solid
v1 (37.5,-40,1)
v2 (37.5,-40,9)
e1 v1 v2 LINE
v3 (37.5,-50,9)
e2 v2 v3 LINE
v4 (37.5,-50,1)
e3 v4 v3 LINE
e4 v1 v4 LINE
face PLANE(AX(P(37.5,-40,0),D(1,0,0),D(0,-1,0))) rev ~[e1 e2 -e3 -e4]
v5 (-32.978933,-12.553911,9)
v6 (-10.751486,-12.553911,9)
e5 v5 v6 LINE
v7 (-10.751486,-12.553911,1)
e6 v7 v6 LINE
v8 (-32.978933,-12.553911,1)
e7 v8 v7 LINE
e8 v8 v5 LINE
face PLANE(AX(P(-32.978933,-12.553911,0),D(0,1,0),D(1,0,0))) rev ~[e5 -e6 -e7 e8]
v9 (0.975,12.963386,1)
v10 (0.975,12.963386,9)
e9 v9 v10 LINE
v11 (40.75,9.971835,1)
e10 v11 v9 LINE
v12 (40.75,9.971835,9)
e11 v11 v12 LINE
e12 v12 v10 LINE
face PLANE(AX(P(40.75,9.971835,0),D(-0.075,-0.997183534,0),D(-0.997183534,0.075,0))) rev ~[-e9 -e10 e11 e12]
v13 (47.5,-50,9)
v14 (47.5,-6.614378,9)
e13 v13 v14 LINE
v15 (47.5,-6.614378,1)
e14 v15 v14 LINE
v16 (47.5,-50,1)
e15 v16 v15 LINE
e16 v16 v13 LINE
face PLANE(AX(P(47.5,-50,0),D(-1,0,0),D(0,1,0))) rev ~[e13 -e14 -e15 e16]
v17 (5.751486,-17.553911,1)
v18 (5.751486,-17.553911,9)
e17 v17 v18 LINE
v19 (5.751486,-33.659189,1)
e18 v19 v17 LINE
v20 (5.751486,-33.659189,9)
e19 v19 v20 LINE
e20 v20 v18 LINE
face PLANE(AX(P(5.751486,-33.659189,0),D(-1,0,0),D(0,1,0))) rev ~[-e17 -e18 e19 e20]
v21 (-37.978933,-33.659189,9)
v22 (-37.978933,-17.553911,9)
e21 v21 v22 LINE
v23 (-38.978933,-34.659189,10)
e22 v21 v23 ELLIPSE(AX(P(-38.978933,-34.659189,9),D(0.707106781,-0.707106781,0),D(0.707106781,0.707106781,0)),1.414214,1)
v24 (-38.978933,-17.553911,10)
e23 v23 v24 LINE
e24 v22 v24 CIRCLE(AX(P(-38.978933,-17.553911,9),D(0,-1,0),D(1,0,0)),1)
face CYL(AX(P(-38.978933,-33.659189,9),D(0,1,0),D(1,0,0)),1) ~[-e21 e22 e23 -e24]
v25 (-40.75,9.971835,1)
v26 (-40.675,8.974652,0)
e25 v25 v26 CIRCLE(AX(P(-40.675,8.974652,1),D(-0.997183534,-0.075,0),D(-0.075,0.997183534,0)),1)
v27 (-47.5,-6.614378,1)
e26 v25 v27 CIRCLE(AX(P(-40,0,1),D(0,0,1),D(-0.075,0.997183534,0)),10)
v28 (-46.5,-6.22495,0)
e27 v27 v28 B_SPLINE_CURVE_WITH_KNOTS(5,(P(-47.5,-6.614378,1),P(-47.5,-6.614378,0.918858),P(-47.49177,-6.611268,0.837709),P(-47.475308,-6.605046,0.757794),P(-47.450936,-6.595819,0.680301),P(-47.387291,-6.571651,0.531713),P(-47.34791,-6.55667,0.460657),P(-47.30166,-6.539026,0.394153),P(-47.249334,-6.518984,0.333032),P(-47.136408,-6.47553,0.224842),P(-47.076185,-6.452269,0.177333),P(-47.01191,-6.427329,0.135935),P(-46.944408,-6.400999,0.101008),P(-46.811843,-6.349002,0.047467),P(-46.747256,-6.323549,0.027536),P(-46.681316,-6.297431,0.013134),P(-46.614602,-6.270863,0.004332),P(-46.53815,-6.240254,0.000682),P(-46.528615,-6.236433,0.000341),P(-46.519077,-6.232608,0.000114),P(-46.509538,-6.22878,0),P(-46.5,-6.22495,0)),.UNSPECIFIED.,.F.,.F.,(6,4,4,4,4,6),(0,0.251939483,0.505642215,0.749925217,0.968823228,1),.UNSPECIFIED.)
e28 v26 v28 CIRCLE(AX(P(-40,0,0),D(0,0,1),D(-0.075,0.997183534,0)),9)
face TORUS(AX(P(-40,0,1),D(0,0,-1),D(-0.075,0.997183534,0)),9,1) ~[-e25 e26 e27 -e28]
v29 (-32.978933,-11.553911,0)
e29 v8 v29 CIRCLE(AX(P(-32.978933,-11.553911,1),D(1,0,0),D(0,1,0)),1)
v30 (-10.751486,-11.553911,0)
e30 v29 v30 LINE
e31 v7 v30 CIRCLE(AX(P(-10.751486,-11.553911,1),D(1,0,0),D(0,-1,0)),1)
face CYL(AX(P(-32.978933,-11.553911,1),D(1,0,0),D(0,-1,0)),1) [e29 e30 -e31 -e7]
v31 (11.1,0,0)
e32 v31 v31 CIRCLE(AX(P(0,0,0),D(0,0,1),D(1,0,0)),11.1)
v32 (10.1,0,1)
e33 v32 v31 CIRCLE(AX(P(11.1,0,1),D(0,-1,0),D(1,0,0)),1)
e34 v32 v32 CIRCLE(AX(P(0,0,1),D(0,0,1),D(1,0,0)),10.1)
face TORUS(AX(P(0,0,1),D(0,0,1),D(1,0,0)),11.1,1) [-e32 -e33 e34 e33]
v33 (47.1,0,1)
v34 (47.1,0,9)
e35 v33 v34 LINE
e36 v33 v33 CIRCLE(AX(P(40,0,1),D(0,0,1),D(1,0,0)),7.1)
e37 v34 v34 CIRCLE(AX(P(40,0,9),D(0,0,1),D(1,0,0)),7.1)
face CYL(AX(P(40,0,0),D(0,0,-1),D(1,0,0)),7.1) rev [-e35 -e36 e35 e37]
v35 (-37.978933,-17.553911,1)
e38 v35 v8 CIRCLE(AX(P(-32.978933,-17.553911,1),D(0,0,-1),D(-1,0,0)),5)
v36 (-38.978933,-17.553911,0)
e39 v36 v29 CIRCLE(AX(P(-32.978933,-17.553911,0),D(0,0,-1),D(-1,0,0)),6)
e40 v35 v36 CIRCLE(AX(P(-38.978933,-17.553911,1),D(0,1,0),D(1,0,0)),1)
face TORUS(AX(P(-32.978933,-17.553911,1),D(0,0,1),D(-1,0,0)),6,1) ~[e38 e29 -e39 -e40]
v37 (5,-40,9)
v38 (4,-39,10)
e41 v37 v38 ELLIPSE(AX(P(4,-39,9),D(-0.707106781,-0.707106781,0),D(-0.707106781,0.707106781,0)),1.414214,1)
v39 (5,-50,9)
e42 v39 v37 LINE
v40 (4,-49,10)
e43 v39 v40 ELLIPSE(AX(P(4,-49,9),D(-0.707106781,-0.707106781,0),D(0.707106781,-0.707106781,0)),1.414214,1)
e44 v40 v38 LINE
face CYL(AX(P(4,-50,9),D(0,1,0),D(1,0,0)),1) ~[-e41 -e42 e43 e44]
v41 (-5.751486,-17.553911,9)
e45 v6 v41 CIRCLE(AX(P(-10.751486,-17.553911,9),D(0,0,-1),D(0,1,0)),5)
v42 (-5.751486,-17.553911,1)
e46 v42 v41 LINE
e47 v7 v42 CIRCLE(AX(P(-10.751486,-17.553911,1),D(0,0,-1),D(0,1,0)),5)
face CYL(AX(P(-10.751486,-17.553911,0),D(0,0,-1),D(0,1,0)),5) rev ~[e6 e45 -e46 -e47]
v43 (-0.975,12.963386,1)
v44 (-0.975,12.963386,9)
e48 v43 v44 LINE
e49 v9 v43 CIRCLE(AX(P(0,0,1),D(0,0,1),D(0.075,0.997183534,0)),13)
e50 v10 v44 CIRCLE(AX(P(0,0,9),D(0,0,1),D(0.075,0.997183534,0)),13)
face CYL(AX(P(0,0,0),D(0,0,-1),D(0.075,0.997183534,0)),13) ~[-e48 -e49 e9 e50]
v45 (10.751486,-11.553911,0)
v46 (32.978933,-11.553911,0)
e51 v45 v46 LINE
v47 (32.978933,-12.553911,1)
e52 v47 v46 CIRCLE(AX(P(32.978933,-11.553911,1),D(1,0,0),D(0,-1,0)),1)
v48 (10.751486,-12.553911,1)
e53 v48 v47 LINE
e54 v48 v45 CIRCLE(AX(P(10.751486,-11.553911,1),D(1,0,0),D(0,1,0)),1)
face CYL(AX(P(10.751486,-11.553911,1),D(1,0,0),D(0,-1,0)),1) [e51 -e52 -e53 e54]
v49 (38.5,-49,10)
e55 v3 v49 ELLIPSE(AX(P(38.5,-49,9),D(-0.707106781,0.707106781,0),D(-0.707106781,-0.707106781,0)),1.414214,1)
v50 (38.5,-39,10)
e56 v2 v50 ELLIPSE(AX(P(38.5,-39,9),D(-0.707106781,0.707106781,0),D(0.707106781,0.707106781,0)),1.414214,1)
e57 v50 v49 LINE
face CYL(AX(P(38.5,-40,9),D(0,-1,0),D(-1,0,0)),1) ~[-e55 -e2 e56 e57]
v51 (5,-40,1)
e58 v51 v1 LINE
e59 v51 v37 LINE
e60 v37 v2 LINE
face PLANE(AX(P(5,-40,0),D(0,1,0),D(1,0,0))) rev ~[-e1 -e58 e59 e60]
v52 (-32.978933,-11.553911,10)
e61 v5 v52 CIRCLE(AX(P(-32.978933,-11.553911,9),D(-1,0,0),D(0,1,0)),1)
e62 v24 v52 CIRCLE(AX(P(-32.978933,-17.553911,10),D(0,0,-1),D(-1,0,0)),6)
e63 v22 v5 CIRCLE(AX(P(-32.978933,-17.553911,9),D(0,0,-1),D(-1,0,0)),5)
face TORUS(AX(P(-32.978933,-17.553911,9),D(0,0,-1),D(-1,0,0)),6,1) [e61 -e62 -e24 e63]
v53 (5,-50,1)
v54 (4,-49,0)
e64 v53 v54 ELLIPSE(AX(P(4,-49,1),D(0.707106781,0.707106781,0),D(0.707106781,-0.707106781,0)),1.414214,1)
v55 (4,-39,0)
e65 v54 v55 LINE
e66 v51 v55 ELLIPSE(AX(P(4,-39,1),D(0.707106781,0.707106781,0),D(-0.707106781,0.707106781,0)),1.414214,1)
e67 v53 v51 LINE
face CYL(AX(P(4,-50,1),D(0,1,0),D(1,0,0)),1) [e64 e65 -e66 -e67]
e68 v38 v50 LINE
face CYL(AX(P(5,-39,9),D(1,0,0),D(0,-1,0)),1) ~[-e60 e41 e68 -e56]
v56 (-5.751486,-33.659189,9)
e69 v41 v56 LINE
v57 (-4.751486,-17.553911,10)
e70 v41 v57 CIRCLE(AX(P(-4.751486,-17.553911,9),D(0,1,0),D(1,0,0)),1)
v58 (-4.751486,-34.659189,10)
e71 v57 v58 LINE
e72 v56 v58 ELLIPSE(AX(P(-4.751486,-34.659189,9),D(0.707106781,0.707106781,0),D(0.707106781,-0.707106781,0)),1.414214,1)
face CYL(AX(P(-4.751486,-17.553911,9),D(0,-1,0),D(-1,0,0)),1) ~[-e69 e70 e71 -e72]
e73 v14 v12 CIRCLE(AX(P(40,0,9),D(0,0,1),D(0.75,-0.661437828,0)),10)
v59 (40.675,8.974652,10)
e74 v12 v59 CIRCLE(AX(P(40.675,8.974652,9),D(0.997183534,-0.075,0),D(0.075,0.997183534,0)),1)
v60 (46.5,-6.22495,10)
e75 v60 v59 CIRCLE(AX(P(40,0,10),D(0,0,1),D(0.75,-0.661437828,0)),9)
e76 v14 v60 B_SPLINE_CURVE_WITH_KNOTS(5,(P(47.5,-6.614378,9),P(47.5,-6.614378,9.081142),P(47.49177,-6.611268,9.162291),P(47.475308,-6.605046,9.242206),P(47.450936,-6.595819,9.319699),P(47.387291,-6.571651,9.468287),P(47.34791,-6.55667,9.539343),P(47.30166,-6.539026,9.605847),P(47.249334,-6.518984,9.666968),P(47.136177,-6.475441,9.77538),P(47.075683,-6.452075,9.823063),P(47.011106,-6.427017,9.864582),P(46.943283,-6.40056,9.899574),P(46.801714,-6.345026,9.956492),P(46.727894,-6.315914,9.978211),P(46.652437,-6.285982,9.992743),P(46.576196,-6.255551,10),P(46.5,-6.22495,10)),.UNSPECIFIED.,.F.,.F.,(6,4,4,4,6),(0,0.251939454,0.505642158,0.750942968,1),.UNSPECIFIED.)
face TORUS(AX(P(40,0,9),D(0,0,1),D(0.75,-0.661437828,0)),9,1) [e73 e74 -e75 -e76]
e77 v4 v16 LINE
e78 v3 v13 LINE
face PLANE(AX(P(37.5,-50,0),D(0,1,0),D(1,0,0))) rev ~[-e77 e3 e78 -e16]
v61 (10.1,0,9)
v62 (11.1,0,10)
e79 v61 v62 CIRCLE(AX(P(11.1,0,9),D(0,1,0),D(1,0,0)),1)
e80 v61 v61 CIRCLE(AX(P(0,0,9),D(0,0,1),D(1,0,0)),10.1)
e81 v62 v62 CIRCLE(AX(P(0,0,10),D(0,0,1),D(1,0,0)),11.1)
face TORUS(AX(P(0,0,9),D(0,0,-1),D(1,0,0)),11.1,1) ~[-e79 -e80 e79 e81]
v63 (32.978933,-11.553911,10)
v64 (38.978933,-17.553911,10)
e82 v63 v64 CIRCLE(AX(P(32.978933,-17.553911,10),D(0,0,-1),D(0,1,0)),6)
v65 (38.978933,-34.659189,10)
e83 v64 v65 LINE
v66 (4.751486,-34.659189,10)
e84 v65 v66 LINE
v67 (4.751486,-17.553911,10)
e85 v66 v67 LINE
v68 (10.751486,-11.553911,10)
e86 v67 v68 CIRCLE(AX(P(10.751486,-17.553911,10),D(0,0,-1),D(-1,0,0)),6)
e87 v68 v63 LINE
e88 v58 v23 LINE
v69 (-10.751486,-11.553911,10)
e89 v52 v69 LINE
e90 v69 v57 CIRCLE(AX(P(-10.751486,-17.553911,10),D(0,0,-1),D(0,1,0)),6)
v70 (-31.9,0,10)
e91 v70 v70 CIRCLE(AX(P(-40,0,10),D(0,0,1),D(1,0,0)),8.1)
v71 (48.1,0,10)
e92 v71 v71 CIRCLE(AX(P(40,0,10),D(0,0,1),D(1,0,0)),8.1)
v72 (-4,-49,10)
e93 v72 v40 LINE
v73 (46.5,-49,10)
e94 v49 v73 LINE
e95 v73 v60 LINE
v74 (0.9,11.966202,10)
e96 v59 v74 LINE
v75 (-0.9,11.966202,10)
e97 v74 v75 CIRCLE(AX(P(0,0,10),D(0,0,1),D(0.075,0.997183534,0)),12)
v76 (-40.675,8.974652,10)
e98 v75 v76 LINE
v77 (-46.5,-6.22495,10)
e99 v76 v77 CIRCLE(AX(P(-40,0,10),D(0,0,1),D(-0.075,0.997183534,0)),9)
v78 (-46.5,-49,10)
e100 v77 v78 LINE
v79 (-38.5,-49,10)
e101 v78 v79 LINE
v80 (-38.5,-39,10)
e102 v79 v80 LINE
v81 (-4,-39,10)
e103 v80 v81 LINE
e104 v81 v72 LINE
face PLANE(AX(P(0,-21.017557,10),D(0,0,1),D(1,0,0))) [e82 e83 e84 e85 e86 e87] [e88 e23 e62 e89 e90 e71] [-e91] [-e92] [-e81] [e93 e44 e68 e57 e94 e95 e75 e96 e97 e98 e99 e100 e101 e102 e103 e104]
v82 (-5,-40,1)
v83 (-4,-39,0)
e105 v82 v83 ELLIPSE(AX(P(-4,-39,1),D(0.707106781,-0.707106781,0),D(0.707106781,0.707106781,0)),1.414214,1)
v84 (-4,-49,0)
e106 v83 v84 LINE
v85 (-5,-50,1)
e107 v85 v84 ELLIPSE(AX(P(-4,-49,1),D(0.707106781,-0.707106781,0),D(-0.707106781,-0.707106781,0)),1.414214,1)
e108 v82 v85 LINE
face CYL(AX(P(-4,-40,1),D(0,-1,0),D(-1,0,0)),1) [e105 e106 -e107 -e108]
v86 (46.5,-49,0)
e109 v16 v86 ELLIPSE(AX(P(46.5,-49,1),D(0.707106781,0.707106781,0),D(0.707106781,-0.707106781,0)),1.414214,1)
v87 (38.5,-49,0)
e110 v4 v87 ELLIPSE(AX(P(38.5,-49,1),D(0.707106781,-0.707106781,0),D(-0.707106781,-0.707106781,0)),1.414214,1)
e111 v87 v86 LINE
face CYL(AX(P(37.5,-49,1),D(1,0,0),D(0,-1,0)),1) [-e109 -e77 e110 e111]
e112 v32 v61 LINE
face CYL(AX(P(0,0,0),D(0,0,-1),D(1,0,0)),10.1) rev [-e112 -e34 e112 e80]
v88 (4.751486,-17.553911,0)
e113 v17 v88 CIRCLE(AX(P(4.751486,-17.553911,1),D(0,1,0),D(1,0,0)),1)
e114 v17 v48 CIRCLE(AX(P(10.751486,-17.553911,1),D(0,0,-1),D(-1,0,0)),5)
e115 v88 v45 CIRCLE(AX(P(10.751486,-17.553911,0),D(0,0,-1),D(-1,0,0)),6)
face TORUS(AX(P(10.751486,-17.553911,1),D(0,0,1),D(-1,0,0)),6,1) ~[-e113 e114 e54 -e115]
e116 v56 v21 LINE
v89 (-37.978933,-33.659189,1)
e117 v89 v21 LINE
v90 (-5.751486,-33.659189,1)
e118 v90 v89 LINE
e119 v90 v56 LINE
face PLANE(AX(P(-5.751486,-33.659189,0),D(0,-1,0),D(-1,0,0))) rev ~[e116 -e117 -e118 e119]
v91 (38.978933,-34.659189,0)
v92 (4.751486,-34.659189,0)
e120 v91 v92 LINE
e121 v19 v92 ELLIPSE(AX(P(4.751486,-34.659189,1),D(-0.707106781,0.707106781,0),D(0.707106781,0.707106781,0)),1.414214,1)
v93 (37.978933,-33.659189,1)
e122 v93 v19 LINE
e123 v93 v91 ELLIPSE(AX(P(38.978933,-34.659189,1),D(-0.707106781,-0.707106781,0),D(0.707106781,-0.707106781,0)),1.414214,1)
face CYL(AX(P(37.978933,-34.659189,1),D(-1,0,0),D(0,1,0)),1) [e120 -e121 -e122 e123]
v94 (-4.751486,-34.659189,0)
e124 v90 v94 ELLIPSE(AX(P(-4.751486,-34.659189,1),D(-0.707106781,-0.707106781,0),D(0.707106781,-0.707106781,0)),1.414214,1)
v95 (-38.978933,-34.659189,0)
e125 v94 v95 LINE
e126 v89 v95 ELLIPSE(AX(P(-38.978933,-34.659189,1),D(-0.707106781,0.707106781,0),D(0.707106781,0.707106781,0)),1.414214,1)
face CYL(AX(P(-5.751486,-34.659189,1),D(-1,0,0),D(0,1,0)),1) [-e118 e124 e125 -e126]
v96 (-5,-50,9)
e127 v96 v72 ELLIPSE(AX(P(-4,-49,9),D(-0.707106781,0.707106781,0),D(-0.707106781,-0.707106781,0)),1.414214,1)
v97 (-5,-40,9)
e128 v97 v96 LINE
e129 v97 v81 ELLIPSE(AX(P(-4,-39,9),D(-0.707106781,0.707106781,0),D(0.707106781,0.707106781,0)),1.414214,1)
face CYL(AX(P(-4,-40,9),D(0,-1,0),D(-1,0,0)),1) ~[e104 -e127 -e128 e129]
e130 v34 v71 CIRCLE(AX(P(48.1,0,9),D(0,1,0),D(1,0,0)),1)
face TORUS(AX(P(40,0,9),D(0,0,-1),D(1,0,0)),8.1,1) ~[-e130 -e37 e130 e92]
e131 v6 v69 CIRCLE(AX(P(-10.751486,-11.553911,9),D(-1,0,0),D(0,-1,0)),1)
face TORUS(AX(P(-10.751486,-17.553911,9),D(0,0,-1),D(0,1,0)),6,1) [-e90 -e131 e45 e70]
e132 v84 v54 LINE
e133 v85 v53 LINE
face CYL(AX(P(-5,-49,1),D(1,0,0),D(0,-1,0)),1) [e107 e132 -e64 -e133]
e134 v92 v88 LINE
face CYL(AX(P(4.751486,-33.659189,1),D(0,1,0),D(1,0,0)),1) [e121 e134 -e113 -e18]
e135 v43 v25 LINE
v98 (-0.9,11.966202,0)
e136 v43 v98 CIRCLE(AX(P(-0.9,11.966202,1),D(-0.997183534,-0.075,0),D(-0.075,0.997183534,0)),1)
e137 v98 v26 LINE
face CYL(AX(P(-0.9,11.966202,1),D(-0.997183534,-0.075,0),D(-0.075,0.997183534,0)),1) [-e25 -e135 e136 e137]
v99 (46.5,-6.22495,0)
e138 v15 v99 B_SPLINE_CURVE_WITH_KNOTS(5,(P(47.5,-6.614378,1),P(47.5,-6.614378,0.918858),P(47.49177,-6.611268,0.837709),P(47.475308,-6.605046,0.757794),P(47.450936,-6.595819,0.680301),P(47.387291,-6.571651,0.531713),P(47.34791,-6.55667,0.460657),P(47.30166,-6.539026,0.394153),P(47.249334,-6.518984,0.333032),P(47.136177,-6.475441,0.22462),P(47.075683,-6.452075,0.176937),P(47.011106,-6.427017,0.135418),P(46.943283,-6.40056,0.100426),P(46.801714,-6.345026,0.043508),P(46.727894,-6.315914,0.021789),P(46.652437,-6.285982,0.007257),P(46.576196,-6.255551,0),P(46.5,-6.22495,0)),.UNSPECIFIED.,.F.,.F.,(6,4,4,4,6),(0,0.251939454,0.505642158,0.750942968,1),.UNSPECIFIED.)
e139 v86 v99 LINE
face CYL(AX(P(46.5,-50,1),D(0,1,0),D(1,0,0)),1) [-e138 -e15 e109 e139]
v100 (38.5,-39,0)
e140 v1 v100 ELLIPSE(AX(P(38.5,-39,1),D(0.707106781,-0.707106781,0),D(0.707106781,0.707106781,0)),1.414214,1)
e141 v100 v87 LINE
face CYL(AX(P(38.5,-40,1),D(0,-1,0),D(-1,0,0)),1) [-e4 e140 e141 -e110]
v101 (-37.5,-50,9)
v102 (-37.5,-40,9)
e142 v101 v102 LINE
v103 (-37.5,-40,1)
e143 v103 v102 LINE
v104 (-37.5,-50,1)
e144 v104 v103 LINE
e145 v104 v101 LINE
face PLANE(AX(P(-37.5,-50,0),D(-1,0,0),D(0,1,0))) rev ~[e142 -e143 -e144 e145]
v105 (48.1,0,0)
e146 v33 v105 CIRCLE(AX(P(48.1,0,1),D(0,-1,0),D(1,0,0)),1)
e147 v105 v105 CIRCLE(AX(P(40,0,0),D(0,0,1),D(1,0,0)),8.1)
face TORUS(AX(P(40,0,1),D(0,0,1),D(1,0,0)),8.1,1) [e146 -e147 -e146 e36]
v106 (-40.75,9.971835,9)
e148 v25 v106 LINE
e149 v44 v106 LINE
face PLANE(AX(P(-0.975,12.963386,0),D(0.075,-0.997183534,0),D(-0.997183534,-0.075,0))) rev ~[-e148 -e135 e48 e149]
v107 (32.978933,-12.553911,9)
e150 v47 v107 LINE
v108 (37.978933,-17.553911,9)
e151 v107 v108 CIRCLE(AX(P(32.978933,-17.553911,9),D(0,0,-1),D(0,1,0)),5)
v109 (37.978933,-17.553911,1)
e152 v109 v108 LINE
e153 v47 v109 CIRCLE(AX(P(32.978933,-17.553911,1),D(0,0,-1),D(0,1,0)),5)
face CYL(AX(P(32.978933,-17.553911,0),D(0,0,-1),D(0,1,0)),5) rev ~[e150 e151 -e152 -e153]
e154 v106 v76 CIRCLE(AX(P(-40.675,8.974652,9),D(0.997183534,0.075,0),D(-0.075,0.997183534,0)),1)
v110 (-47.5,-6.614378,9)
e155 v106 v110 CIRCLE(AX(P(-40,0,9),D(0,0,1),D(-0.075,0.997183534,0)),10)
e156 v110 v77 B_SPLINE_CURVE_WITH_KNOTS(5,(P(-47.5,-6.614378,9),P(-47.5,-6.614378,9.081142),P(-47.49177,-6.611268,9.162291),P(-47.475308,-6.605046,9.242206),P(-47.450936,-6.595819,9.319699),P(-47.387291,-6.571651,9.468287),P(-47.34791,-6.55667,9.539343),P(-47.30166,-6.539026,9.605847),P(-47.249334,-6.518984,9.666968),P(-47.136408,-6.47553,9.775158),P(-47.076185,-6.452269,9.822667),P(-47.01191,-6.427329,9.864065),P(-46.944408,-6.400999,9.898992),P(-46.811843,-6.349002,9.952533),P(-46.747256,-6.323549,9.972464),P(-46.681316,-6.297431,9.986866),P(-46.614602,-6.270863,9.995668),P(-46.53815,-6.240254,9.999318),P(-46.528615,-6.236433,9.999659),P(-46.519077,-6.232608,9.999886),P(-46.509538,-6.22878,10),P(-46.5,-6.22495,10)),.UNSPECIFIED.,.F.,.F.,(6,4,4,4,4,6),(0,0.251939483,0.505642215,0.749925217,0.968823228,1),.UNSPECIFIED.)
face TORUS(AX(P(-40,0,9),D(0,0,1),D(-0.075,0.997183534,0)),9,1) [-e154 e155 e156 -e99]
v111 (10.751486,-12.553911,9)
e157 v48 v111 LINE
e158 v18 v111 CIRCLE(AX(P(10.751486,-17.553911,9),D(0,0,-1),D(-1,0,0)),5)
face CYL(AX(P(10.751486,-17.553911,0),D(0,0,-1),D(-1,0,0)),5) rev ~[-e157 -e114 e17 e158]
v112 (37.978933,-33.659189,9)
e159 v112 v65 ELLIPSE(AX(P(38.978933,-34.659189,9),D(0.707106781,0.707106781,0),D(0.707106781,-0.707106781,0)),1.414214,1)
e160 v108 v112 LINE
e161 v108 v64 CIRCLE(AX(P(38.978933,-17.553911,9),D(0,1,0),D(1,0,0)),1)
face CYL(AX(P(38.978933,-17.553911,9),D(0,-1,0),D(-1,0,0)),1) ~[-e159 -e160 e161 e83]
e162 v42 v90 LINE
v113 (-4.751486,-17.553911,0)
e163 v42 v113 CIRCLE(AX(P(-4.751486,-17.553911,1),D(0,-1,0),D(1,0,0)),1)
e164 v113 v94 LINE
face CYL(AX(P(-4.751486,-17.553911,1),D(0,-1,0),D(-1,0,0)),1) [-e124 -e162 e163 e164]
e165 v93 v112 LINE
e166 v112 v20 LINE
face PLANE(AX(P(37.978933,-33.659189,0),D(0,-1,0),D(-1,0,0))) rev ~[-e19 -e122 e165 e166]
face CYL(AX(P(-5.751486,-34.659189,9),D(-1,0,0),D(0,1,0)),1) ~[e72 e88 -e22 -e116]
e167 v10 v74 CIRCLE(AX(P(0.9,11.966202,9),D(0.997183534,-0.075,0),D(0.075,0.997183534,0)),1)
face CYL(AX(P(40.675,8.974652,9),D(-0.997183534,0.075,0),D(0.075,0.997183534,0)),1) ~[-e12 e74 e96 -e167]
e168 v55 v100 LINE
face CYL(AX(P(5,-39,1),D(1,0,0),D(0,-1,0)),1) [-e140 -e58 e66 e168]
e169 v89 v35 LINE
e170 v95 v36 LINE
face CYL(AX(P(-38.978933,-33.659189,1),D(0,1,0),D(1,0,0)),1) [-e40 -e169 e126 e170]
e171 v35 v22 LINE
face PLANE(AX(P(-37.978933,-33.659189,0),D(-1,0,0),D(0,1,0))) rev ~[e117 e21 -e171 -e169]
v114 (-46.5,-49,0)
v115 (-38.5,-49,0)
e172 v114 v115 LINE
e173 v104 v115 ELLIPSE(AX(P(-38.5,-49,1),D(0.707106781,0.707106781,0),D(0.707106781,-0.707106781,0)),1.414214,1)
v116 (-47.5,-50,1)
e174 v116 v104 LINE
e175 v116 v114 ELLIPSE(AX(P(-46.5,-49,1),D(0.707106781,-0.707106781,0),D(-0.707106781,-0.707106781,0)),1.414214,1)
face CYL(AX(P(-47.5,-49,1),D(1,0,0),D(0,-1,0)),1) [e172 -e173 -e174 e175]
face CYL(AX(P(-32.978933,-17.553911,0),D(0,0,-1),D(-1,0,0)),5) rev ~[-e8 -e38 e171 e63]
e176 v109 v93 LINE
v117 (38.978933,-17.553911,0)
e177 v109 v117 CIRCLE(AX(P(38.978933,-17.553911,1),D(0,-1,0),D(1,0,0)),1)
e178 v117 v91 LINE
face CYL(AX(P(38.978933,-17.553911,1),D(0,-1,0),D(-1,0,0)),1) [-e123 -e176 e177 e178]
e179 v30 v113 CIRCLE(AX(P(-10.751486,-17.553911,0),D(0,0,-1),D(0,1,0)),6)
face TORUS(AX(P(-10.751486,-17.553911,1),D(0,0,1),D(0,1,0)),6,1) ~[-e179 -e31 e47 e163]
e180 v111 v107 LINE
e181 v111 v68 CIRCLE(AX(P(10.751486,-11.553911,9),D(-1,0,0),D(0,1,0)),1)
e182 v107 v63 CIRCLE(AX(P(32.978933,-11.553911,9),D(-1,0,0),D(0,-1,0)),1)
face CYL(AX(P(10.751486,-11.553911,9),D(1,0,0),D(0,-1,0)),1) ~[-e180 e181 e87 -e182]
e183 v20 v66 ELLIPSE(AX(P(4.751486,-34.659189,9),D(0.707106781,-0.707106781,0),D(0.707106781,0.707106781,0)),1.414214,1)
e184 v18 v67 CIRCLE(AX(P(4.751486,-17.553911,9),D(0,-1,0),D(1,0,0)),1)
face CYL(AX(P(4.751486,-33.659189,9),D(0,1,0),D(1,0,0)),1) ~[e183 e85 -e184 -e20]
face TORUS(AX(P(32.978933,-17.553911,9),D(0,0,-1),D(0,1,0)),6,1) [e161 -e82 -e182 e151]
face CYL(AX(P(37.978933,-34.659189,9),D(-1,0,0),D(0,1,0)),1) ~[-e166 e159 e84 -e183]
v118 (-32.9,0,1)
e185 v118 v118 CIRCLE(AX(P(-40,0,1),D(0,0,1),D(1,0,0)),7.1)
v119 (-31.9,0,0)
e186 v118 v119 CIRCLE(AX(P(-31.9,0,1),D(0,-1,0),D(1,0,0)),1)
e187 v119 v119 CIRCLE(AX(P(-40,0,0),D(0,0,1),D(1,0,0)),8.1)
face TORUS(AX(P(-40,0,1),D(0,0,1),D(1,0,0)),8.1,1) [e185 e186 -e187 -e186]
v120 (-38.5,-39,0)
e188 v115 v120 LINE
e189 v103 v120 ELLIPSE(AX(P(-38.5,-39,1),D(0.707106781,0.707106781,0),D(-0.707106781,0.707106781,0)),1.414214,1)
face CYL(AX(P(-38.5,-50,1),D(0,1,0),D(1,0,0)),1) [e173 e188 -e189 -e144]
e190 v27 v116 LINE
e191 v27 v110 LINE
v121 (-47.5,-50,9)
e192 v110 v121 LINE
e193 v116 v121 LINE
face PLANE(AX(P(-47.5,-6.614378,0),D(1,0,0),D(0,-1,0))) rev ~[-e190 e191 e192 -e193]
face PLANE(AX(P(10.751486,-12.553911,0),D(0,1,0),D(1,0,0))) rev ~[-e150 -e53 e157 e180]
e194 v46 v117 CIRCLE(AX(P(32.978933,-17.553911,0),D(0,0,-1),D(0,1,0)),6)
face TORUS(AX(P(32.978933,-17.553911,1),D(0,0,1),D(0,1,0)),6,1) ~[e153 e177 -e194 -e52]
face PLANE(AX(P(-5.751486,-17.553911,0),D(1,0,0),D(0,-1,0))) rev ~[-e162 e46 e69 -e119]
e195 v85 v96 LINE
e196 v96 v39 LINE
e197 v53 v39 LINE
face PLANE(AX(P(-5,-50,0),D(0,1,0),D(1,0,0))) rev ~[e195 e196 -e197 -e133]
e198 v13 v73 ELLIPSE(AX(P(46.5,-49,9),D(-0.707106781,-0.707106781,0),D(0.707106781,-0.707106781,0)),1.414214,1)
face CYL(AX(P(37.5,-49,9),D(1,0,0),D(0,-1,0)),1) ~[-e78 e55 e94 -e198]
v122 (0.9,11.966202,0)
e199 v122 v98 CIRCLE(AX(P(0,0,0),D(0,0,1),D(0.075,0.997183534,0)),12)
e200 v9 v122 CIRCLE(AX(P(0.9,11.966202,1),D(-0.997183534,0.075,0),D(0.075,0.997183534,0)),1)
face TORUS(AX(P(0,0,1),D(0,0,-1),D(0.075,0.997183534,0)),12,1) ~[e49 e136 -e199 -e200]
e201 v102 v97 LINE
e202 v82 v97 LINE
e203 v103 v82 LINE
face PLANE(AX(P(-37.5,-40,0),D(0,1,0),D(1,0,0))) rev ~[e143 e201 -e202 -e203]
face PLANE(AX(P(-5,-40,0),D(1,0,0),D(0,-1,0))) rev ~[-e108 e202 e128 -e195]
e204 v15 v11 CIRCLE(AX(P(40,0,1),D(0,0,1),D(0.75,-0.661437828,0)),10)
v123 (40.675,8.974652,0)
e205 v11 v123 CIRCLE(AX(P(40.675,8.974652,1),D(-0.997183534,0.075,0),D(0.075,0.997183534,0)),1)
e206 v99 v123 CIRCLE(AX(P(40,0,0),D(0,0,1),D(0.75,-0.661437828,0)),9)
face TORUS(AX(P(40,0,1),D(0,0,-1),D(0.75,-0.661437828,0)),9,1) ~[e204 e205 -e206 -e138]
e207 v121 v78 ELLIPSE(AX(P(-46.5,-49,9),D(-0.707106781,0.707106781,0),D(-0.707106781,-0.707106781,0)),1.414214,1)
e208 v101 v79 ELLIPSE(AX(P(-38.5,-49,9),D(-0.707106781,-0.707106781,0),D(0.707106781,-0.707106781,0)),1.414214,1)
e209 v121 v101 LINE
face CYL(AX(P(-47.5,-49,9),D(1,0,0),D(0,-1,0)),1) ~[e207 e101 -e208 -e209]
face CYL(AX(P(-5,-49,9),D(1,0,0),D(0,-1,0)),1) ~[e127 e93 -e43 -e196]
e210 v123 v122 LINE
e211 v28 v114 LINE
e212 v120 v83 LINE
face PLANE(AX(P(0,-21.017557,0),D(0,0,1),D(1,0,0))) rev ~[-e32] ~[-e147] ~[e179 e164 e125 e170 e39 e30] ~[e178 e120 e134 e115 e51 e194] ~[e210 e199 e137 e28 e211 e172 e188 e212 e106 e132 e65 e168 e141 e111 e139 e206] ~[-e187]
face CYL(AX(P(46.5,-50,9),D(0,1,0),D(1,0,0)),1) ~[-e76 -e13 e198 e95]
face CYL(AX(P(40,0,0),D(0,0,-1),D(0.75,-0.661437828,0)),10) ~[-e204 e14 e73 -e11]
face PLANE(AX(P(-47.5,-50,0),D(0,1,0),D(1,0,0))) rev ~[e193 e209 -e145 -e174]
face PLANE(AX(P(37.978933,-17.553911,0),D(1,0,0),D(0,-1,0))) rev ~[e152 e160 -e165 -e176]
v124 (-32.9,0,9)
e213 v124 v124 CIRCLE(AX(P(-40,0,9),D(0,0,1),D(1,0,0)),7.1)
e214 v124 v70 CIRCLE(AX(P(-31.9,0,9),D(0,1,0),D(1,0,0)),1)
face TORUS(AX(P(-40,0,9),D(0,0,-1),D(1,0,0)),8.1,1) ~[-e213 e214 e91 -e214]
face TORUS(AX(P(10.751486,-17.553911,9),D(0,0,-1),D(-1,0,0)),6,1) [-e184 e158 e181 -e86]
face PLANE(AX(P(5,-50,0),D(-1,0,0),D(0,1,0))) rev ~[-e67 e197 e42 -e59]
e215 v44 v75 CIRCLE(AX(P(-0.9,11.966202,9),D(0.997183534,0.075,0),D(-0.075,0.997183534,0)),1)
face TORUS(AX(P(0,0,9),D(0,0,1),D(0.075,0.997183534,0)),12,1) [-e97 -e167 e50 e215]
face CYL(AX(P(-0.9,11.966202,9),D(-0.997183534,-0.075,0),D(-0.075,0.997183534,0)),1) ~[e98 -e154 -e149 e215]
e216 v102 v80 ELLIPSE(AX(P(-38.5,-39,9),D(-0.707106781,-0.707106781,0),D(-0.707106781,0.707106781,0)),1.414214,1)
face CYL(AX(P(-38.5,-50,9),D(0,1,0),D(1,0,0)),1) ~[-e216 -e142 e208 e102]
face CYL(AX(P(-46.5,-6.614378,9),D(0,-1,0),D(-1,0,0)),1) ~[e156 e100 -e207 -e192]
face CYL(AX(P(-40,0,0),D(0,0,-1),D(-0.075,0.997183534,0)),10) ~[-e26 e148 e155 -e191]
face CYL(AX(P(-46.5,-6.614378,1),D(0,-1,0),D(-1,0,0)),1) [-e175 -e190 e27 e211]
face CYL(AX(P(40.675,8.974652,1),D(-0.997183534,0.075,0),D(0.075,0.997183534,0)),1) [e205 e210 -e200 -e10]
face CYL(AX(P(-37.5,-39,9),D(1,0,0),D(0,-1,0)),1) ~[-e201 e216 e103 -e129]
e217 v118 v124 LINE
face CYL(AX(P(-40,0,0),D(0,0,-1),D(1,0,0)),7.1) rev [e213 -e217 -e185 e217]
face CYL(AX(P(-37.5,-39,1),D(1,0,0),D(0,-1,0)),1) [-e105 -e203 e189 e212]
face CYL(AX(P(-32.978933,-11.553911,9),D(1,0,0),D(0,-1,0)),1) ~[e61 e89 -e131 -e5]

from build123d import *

# Parameters (mm, degrees)
F0_R     = 7.1
F0_R_2   = 10.1
F1_DEPTH = 10
F2_R     = 1


# Not quite as in the source:
# - a feature names something its author has since deleted; it is built from what else it names


with BuildPart() as f1:
    # F0 (on Top) → F1 (new body)
    with BuildSketch(Plane.XY):
        with BuildLine():
            Line((-37.5, -50), (-37.5, -40))
            Line((-37.5, -40), (-5, -40))
            Line((-5, -40), (-5, -50))
            Line((-5, -50), (0, -50))
            Line((0, -50), (5, -50))
            Line((5, -50), (5, -40))
            Line((5, -40), (37.5, -40))
            Line((37.5, -40), (37.5, -50))
            Line((37.5, -50), (47.5, -50))
            Line((47.5, -50), (47.5, -40))
            Line((47.5, -40), (47.5, -6.6143782777))
            ThreePointArc((47.5, -6.6143782777), (49.2623563699, 3.7694501558), (40.75, 9.9718353376))
            Line((40.75, 9.9718353376), (0.975, 12.9633859389))
            ThreePointArc((0.975, 12.9633859389), (0, 13), (-0.975, 12.9633859389))
            Line((-0.975, 12.9633859389), (-40.75, 9.9718353376))
            ThreePointArc((-40.75, 9.9718353376), (-49.2623563699, 3.7694501558), (-47.5, -6.6143782777))
            Line((-47.5, -6.6143782777), (-47.5, -40))
            Line((-47.5, -40), (-47.5, -50))
            Line((-47.5, -50), (-37.5, -50))
        make_face()
        with BuildLine():
            Line((-5.7514859363, -17.5539107248), (-5.7514859363, -33.6591888964))
            Line((-5.7514859363, -33.6591888964), (-37.9789326537, -33.6591888964))
            Line((-37.9789326537, -33.6591888964), (-37.9789326537, -17.5539107248))
            ThreePointArc((-37.9789326537, -17.5539107248), (-36.5144665596, -14.0183768189), (-32.9789326537, -12.5539107248))
            Line((-32.9789326537, -12.5539107248), (-10.7514859363, -12.5539107248))
            ThreePointArc((-10.7514859363, -12.5539107248), (-7.2159520304, -14.0183768189), (-5.7514859363, -17.5539107248))
        make_face(mode=Mode.SUBTRACT)
        with BuildLine():
            Line((37.9789326537, -33.6591888964), (5.7514859363, -33.6591888964))
            Line((5.7514859363, -33.6591888964), (5.7514859363, -17.5539107248))
            ThreePointArc((5.7514859363, -17.5539107248), (7.2159520304, -14.0183768189), (10.7514859363, -12.5539107248))
            Line((10.7514859363, -12.5539107248), (32.9789326537, -12.5539107248))
            ThreePointArc((32.9789326537, -12.5539107248), (36.5144665596, -14.0183768189), (37.9789326537, -17.5539107248))
            Line((37.9789326537, -17.5539107248), (37.9789326537, -33.6591888964))
        make_face(mode=Mode.SUBTRACT)
        with Locations((-40, 0)):
            Circle(F0_R, mode=Mode.SUBTRACT)
        Circle(F0_R_2, mode=Mode.SUBTRACT)
        with Locations((40, 0)):
            Circle(F0_R, mode=Mode.SUBTRACT)
    extrude(amount=F1_DEPTH)

    # F2
    f2_edges = [f1.edges().sort_by_distance(p)[0] for p in [
        (-49.262356, 3.76945, 10),
        (-47.5, -28.307189, 10),
        (-42.5, -50, 10),
        (-37.5, -45, 10),
        (-21.25, -40, 10),
        (-5, -45, 10),
        (0, -50, 10),
        (5, -45, 10),
        (21.25, -40, 10),
        (37.5, -45, 10),
        (42.5, -50, 10),
        (47.5, -28.307189, 10),
        (49.262356, 3.76945, 10),
        (20.8625, 11.467611, 10),
        (0, 13, 10),
        (-20.8625, 11.467611, 10),
        (-5.751486, -25.60655, 10),
        (-21.865209, -33.659189, 10),
        (-37.978933, -25.60655, 10),
        (-36.514467, -14.018377, 10),
        (-21.865209, -12.553911, 10),
        (-7.215952, -14.018377, 10),
        (37.978933, -25.60655, 10),
        (21.865209, -33.659189, 10),
        (5.751486, -25.60655, 10),
        (7.215952, -14.018377, 10),
        (21.865209, -12.553911, 10),
        (36.514467, -14.018377, 10),
        (-47.1, 0, 10),
        (-10.1, 0, 10),
        (32.9, 0, 10),
        (-49.262356, 3.76945, 0),
        (-47.5, -28.307189, 0),
        (-42.5, -50, 0),
        (-37.5, -45, 0),
        (-21.25, -40, 0),
        (-5, -45, 0),
        (0, -50, 0),
        (5, -45, 0),
        (21.25, -40, 0),
        (37.5, -45, 0),
        (42.5, -50, 0),
        (47.5, -28.307189, 0),
        (49.262356, 3.76945, 0),
        (20.8625, 11.467611, 0),
        (0, 13, 0),
        (-20.8625, 11.467611, 0),
        (-5.751486, -25.60655, 0),
        (-21.865209, -33.659189, 0),
        (-37.978933, -25.60655, 0),
        (-36.514467, -14.018377, 0),
        (-21.865209, -12.553911, 0),
        (-7.215952, -14.018377, 0),
        (37.978933, -25.60655, 0),
        (21.865209, -33.659189, 0),
        (5.751486, -25.60655, 0),
        (7.215952, -14.018377, 0),
        (21.865209, -12.553911, 0),
        (36.514467, -14.018377, 0),
        (-47.1, 0, 0),
        (-10.1, 0, 0),
        (32.9, 0, 0),
    ]]
    fillet(f2_edges, radius=F2_R)


solid = f1.part
